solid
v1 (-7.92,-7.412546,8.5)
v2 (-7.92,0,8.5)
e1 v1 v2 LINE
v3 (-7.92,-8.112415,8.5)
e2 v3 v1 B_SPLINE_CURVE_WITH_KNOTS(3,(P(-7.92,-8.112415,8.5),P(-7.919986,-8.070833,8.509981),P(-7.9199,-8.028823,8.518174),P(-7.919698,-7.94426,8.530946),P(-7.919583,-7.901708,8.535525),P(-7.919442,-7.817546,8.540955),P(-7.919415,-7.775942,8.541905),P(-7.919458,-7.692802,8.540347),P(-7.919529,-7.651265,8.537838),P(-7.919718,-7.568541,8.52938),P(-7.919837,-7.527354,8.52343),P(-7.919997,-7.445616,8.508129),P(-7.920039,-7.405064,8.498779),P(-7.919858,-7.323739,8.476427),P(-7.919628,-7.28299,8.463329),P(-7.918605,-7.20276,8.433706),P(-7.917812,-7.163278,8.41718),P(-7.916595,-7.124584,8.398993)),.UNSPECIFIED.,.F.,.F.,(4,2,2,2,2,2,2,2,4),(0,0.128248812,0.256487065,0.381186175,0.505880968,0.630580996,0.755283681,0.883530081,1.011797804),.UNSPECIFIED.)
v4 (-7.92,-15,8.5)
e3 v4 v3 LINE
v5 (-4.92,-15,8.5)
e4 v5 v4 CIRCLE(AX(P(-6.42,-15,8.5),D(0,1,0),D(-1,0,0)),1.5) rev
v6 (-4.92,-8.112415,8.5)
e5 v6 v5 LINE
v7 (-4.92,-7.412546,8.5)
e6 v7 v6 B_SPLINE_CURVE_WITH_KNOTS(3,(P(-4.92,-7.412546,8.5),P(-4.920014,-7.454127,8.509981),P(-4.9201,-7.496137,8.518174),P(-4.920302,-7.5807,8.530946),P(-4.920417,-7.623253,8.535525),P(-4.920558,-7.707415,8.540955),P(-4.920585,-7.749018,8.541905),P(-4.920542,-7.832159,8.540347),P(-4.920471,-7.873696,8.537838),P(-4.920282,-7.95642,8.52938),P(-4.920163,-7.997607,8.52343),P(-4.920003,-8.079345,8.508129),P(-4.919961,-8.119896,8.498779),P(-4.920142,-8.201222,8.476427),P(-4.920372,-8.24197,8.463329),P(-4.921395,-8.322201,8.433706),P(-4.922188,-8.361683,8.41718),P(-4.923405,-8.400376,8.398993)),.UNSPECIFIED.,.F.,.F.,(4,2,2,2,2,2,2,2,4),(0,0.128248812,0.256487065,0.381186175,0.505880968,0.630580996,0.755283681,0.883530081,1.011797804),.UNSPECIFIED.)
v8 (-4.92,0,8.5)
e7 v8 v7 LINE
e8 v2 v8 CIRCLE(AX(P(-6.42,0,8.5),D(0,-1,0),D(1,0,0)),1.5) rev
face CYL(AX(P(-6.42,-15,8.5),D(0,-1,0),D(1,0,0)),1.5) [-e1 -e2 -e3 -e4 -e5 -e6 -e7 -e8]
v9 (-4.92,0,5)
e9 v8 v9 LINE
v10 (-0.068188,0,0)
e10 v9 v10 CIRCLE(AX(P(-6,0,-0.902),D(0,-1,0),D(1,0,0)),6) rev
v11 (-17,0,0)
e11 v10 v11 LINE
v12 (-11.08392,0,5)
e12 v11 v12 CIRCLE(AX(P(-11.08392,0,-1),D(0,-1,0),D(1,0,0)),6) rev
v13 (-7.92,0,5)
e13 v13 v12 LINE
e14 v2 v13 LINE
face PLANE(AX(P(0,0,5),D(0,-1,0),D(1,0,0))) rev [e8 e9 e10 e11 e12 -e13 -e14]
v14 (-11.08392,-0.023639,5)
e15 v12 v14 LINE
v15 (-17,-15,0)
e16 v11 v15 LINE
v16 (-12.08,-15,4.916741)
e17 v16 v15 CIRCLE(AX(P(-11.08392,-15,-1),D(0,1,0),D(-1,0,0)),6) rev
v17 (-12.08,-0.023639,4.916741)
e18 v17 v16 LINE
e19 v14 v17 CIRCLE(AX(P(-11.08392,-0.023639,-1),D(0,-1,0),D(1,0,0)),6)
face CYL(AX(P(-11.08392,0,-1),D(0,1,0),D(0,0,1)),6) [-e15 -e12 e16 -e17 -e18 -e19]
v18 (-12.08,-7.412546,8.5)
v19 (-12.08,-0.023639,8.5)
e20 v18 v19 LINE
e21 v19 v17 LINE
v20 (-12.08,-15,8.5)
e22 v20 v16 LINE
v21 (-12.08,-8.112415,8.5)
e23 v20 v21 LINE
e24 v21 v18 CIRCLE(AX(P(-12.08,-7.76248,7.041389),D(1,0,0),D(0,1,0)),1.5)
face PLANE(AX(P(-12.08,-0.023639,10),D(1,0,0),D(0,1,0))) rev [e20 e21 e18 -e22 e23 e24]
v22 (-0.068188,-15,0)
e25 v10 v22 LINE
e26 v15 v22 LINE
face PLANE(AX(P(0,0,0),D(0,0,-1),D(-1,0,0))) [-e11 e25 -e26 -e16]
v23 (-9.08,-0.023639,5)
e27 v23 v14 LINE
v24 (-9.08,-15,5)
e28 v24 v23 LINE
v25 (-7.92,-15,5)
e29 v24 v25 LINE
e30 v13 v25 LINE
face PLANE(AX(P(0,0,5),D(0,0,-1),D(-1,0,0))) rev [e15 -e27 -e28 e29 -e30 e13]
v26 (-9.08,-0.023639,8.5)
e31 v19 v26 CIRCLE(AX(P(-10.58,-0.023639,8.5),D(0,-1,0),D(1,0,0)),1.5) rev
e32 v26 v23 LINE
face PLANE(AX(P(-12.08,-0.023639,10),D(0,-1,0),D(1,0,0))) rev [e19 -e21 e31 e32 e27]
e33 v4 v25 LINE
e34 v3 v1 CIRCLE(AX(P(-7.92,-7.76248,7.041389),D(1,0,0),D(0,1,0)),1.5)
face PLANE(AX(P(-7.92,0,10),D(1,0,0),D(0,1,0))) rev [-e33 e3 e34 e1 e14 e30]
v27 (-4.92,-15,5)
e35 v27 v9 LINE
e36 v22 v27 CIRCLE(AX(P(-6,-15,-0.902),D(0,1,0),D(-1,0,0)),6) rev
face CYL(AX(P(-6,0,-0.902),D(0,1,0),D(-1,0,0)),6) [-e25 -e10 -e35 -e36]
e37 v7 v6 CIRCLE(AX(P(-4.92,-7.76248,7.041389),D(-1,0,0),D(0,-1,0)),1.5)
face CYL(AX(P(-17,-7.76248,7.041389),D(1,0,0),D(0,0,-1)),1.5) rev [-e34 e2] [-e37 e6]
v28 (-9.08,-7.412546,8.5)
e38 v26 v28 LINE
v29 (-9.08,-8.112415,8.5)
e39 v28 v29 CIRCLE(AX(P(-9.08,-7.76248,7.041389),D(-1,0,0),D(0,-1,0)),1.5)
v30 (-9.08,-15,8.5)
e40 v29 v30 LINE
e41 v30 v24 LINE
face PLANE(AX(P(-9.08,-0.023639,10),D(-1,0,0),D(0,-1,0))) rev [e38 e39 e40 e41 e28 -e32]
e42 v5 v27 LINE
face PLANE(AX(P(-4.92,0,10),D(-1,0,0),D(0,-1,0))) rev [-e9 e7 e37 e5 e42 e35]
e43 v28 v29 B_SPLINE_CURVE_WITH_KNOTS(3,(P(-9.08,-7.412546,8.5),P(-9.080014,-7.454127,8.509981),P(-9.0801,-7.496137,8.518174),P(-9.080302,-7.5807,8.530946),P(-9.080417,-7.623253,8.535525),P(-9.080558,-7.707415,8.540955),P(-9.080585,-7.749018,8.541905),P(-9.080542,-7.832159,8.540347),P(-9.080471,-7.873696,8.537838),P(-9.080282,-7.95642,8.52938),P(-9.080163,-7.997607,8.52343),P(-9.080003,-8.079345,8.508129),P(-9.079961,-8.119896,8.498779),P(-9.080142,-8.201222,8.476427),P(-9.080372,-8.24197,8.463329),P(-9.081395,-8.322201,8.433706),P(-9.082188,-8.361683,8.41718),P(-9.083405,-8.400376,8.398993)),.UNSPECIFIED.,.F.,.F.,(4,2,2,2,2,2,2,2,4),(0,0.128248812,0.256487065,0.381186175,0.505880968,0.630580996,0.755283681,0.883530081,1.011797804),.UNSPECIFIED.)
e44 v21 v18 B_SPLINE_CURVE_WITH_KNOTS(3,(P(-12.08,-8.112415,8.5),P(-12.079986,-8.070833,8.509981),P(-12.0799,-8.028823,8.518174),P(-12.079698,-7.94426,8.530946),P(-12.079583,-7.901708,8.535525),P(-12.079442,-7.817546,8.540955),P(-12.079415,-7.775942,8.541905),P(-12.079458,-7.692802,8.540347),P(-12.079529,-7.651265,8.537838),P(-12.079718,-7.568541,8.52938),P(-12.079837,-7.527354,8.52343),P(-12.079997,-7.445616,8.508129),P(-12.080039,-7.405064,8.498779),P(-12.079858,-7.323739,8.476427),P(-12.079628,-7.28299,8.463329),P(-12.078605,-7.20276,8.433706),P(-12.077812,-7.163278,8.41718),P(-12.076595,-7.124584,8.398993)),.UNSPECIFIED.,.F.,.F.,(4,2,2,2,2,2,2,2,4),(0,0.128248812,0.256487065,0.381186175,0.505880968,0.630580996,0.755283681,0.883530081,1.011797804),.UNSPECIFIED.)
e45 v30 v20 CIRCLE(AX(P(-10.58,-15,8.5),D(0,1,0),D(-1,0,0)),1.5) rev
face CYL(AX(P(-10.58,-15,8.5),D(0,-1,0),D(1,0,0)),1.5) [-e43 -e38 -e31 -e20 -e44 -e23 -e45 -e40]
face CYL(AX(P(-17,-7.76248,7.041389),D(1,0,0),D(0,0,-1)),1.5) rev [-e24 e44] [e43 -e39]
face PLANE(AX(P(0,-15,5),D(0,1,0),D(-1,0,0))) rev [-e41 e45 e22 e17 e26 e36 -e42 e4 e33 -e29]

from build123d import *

# Parameters (mm, degrees)
SKETCH1_W               = 17
SKETCH1_H               = 15
BOSS_EXTRUDE1_DEPTH     = 5
SKETCH2_W               = 3
SKETCH2_H               = 15
SKETCH2_H_2             = 14.97636143
BOSS_EXTRUDE2_DEPTH     = 5
CUT_EXTRUDE2_DEPTH      = 21.185301583
CUT_EXTRUDE2_DEPTH_BACK = 21.185301583
SKETCH4_R               = 1.5
FILLET1_R               = 6
FILLET3_RADIUS          = 1.5
FILLET3_LENGTH          = 14.97636143
FILLET4_RADIUS          = 1.5
FILLET4_LENGTH          = 15


with BuildPart() as part:
    # Sketch1 → Boss-Extrude1 (new body)
    with BuildSketch(Plane.XY):
        with Locations((-8.5, -7.5)):
            Rectangle(SKETCH1_W, SKETCH1_H)
    extrude(amount=BOSS_EXTRUDE1_DEPTH)

    # Sketch2 → Boss-Extrude2 (add)
    with BuildSketch(Plane.XY.offset(5)):
        with Locations((-6.42, -7.5)):
            Rectangle(SKETCH2_W, SKETCH2_H)
        with Locations((-10.58, -7.511819285)):
            Rectangle(SKETCH2_W, SKETCH2_H_2)
    extrude(amount=BOSS_EXTRUDE2_DEPTH)

    # Sketch4 → Cut-Extrude2 (cut, two sides: drawn at the far end of the back side and taken through both)
    with BuildSketch(Plane(origin=(-9.08, 0, 0), x_dir=(0, 0, -1), z_dir=(1, 0, 0)).offset(-CUT_EXTRUDE2_DEPTH_BACK)):
        with Locations(Location((-7.041389116, -7.762480296, 0), (0, 0, 270))):
            Circle(SKETCH4_R)
    extrude(amount=CUT_EXTRUDE2_DEPTH + CUT_EXTRUDE2_DEPTH_BACK, mode=Mode.SUBTRACT)

    # Fillet1
    # the kernel refuses this fillet: 6 mm, written as the material it takes off along each edge
    with BuildSketch(Plane(origin=(0, -29.754999153, 5), x_dir=(0, 0, -1), z_dir=(0, 1, 0))) as fillet1_piece_1:
        with BuildLine():
            CenterArc((5.901999661, 6), FILLET1_R, 190.369759805, 79.630240195)
            Line((0, 4.92), (0, 0))
            Line((0, 0), (5.901999661, 0))
        make_face()
    extrude(amount=44.509998306, mode=Mode.SUBTRACT)
    # the kernel refuses this fillet: 6 mm, written as the material it takes off along each edge
    with BuildSketch(Plane(origin=(-17, 14.790199458, 5), x_dir=(0, 0, -1), z_dir=(0, -1, 0))) as fillet1_2_piece_1_section:
        with BuildLine():
            CenterArc((6, 5.916079783), FILLET1_R, 180, 80.405931773)
            Line((0, 5.916079783), (0, 0))
            Line((0, 0), (5, 0))
        make_face()
    fillet1_2_piece_1 = extrude(amount=44.580398916, mode=Mode.PRIVATE)
    fillet1_2_piece_1 = split(fillet1_2_piece_1, bisect_by=Plane(origin=(-17, -0.02363857, 5), z_dir=(0, 1, 0)), keep=Keep.TOP, mode=Mode.PRIVATE)
    fillet1_2_piece_1 = split(fillet1_2_piece_1, bisect_by=Plane(origin=(-12.08, 14.790199458, 5), z_dir=(-1, 0, 0)), keep=Keep.TOP, mode=Mode.PRIVATE)
    add(fillet1_2_piece_1, mode=Mode.SUBTRACT)
    with BuildSketch(Plane(origin=(-17, 14.790199458, 5), x_dir=(0, 0, -1), z_dir=(0, -1, 0))) as fillet1_2_piece_2_section:
        with BuildLine():
            CenterArc((6, 5.916079783), FILLET1_R, 180, 80.405931773)
            Line((0, 5.916079783), (0, 0))
            Line((0, 0), (5, 0))
        make_face()
    fillet1_2_piece_2 = extrude(amount=44.580398916, mode=Mode.PRIVATE)
    fillet1_2_piece_2 = split(fillet1_2_piece_2, bisect_by=Plane(origin=(-17, -0.02363857, 5), z_dir=(0, 1, 0)), keep=Keep.TOP, mode=Mode.PRIVATE)
    fillet1_2_piece_2 = split(fillet1_2_piece_2, bisect_by=Plane(origin=(-12.08, 14.790199458, 5), z_dir=(1, 0, 0)), keep=Keep.TOP, mode=Mode.PRIVATE)
    add(fillet1_2_piece_2, mode=Mode.SUBTRACT)
    with BuildSketch(Plane(origin=(-17, 14.790199458, 5), x_dir=(0, 0, -1), z_dir=(0, -1, 0))) as fillet1_2_piece_3_section:
        with BuildLine():
            CenterArc((6, 5.916079783), FILLET1_R, 180, 80.405931773)
            Line((0, 5.916079783), (0, 0))
            Line((0, 0), (5, 0))
        make_face()
    fillet1_2_piece_3 = extrude(amount=44.580398916, mode=Mode.PRIVATE)
    fillet1_2_piece_3 = split(fillet1_2_piece_3, bisect_by=Plane(origin=(-17, -0.02363857, 5), z_dir=(0, -1, 0)), keep=Keep.TOP, mode=Mode.PRIVATE)
    fillet1_2_piece_3 = split(fillet1_2_piece_3, bisect_by=Plane(origin=(-12.08, 14.790199458, 5), z_dir=(-1, 0, 0)), keep=Keep.TOP, mode=Mode.PRIVATE)
    add(fillet1_2_piece_3, mode=Mode.SUBTRACT)

    # Fillet3: full round fillet: the end face becomes a half cylinder, R = half its width
    fillet3_face = Plane((-10.58, -7.511819285, 10), x_dir=(0, -1, 0), z_dir=(0, 0, 1))  # on the end face: x along it, z out of the body
    fillet3_slab = fillet3_face.offset(-FILLET3_RADIUS / 2) * Box(FILLET3_LENGTH, 2 * FILLET3_RADIUS, FILLET3_RADIUS, mode=Mode.PRIVATE)  # the body's end, R deep
    fillet3_round = Plane((-10.58, -7.511819285, 8.5), x_dir=(0, 0, 1), z_dir=(0, -1, 0)) * Cylinder(FILLET3_RADIUS, FILLET3_LENGTH, mode=Mode.PRIVATE)  # its axis R under the face
    add(fillet3_slab - fillet3_round, mode=Mode.SUBTRACT)

    # Fillet4: full round fillet: the end face becomes a half cylinder, R = half its width
    fillet4_face = Plane((-6.42, -7.5, 10), x_dir=(0, -1, 0), z_dir=(0, 0, 1))  # on the end face: x along it, z out of the body
    fillet4_slab = fillet4_face.offset(-FILLET4_RADIUS / 2) * Box(FILLET4_LENGTH, 2 * FILLET4_RADIUS, FILLET4_RADIUS, mode=Mode.PRIVATE)  # the body's end, R deep
    fillet4_round = Plane((-6.42, -7.5, 8.5), x_dir=(0, 0, 1), z_dir=(0, -1, 0)) * Cylinder(FILLET4_RADIUS, FILLET4_LENGTH, mode=Mode.PRIVATE)  # its axis R under the face
    add(fillet4_slab - fillet4_round, mode=Mode.SUBTRACT)


solid = part.part
